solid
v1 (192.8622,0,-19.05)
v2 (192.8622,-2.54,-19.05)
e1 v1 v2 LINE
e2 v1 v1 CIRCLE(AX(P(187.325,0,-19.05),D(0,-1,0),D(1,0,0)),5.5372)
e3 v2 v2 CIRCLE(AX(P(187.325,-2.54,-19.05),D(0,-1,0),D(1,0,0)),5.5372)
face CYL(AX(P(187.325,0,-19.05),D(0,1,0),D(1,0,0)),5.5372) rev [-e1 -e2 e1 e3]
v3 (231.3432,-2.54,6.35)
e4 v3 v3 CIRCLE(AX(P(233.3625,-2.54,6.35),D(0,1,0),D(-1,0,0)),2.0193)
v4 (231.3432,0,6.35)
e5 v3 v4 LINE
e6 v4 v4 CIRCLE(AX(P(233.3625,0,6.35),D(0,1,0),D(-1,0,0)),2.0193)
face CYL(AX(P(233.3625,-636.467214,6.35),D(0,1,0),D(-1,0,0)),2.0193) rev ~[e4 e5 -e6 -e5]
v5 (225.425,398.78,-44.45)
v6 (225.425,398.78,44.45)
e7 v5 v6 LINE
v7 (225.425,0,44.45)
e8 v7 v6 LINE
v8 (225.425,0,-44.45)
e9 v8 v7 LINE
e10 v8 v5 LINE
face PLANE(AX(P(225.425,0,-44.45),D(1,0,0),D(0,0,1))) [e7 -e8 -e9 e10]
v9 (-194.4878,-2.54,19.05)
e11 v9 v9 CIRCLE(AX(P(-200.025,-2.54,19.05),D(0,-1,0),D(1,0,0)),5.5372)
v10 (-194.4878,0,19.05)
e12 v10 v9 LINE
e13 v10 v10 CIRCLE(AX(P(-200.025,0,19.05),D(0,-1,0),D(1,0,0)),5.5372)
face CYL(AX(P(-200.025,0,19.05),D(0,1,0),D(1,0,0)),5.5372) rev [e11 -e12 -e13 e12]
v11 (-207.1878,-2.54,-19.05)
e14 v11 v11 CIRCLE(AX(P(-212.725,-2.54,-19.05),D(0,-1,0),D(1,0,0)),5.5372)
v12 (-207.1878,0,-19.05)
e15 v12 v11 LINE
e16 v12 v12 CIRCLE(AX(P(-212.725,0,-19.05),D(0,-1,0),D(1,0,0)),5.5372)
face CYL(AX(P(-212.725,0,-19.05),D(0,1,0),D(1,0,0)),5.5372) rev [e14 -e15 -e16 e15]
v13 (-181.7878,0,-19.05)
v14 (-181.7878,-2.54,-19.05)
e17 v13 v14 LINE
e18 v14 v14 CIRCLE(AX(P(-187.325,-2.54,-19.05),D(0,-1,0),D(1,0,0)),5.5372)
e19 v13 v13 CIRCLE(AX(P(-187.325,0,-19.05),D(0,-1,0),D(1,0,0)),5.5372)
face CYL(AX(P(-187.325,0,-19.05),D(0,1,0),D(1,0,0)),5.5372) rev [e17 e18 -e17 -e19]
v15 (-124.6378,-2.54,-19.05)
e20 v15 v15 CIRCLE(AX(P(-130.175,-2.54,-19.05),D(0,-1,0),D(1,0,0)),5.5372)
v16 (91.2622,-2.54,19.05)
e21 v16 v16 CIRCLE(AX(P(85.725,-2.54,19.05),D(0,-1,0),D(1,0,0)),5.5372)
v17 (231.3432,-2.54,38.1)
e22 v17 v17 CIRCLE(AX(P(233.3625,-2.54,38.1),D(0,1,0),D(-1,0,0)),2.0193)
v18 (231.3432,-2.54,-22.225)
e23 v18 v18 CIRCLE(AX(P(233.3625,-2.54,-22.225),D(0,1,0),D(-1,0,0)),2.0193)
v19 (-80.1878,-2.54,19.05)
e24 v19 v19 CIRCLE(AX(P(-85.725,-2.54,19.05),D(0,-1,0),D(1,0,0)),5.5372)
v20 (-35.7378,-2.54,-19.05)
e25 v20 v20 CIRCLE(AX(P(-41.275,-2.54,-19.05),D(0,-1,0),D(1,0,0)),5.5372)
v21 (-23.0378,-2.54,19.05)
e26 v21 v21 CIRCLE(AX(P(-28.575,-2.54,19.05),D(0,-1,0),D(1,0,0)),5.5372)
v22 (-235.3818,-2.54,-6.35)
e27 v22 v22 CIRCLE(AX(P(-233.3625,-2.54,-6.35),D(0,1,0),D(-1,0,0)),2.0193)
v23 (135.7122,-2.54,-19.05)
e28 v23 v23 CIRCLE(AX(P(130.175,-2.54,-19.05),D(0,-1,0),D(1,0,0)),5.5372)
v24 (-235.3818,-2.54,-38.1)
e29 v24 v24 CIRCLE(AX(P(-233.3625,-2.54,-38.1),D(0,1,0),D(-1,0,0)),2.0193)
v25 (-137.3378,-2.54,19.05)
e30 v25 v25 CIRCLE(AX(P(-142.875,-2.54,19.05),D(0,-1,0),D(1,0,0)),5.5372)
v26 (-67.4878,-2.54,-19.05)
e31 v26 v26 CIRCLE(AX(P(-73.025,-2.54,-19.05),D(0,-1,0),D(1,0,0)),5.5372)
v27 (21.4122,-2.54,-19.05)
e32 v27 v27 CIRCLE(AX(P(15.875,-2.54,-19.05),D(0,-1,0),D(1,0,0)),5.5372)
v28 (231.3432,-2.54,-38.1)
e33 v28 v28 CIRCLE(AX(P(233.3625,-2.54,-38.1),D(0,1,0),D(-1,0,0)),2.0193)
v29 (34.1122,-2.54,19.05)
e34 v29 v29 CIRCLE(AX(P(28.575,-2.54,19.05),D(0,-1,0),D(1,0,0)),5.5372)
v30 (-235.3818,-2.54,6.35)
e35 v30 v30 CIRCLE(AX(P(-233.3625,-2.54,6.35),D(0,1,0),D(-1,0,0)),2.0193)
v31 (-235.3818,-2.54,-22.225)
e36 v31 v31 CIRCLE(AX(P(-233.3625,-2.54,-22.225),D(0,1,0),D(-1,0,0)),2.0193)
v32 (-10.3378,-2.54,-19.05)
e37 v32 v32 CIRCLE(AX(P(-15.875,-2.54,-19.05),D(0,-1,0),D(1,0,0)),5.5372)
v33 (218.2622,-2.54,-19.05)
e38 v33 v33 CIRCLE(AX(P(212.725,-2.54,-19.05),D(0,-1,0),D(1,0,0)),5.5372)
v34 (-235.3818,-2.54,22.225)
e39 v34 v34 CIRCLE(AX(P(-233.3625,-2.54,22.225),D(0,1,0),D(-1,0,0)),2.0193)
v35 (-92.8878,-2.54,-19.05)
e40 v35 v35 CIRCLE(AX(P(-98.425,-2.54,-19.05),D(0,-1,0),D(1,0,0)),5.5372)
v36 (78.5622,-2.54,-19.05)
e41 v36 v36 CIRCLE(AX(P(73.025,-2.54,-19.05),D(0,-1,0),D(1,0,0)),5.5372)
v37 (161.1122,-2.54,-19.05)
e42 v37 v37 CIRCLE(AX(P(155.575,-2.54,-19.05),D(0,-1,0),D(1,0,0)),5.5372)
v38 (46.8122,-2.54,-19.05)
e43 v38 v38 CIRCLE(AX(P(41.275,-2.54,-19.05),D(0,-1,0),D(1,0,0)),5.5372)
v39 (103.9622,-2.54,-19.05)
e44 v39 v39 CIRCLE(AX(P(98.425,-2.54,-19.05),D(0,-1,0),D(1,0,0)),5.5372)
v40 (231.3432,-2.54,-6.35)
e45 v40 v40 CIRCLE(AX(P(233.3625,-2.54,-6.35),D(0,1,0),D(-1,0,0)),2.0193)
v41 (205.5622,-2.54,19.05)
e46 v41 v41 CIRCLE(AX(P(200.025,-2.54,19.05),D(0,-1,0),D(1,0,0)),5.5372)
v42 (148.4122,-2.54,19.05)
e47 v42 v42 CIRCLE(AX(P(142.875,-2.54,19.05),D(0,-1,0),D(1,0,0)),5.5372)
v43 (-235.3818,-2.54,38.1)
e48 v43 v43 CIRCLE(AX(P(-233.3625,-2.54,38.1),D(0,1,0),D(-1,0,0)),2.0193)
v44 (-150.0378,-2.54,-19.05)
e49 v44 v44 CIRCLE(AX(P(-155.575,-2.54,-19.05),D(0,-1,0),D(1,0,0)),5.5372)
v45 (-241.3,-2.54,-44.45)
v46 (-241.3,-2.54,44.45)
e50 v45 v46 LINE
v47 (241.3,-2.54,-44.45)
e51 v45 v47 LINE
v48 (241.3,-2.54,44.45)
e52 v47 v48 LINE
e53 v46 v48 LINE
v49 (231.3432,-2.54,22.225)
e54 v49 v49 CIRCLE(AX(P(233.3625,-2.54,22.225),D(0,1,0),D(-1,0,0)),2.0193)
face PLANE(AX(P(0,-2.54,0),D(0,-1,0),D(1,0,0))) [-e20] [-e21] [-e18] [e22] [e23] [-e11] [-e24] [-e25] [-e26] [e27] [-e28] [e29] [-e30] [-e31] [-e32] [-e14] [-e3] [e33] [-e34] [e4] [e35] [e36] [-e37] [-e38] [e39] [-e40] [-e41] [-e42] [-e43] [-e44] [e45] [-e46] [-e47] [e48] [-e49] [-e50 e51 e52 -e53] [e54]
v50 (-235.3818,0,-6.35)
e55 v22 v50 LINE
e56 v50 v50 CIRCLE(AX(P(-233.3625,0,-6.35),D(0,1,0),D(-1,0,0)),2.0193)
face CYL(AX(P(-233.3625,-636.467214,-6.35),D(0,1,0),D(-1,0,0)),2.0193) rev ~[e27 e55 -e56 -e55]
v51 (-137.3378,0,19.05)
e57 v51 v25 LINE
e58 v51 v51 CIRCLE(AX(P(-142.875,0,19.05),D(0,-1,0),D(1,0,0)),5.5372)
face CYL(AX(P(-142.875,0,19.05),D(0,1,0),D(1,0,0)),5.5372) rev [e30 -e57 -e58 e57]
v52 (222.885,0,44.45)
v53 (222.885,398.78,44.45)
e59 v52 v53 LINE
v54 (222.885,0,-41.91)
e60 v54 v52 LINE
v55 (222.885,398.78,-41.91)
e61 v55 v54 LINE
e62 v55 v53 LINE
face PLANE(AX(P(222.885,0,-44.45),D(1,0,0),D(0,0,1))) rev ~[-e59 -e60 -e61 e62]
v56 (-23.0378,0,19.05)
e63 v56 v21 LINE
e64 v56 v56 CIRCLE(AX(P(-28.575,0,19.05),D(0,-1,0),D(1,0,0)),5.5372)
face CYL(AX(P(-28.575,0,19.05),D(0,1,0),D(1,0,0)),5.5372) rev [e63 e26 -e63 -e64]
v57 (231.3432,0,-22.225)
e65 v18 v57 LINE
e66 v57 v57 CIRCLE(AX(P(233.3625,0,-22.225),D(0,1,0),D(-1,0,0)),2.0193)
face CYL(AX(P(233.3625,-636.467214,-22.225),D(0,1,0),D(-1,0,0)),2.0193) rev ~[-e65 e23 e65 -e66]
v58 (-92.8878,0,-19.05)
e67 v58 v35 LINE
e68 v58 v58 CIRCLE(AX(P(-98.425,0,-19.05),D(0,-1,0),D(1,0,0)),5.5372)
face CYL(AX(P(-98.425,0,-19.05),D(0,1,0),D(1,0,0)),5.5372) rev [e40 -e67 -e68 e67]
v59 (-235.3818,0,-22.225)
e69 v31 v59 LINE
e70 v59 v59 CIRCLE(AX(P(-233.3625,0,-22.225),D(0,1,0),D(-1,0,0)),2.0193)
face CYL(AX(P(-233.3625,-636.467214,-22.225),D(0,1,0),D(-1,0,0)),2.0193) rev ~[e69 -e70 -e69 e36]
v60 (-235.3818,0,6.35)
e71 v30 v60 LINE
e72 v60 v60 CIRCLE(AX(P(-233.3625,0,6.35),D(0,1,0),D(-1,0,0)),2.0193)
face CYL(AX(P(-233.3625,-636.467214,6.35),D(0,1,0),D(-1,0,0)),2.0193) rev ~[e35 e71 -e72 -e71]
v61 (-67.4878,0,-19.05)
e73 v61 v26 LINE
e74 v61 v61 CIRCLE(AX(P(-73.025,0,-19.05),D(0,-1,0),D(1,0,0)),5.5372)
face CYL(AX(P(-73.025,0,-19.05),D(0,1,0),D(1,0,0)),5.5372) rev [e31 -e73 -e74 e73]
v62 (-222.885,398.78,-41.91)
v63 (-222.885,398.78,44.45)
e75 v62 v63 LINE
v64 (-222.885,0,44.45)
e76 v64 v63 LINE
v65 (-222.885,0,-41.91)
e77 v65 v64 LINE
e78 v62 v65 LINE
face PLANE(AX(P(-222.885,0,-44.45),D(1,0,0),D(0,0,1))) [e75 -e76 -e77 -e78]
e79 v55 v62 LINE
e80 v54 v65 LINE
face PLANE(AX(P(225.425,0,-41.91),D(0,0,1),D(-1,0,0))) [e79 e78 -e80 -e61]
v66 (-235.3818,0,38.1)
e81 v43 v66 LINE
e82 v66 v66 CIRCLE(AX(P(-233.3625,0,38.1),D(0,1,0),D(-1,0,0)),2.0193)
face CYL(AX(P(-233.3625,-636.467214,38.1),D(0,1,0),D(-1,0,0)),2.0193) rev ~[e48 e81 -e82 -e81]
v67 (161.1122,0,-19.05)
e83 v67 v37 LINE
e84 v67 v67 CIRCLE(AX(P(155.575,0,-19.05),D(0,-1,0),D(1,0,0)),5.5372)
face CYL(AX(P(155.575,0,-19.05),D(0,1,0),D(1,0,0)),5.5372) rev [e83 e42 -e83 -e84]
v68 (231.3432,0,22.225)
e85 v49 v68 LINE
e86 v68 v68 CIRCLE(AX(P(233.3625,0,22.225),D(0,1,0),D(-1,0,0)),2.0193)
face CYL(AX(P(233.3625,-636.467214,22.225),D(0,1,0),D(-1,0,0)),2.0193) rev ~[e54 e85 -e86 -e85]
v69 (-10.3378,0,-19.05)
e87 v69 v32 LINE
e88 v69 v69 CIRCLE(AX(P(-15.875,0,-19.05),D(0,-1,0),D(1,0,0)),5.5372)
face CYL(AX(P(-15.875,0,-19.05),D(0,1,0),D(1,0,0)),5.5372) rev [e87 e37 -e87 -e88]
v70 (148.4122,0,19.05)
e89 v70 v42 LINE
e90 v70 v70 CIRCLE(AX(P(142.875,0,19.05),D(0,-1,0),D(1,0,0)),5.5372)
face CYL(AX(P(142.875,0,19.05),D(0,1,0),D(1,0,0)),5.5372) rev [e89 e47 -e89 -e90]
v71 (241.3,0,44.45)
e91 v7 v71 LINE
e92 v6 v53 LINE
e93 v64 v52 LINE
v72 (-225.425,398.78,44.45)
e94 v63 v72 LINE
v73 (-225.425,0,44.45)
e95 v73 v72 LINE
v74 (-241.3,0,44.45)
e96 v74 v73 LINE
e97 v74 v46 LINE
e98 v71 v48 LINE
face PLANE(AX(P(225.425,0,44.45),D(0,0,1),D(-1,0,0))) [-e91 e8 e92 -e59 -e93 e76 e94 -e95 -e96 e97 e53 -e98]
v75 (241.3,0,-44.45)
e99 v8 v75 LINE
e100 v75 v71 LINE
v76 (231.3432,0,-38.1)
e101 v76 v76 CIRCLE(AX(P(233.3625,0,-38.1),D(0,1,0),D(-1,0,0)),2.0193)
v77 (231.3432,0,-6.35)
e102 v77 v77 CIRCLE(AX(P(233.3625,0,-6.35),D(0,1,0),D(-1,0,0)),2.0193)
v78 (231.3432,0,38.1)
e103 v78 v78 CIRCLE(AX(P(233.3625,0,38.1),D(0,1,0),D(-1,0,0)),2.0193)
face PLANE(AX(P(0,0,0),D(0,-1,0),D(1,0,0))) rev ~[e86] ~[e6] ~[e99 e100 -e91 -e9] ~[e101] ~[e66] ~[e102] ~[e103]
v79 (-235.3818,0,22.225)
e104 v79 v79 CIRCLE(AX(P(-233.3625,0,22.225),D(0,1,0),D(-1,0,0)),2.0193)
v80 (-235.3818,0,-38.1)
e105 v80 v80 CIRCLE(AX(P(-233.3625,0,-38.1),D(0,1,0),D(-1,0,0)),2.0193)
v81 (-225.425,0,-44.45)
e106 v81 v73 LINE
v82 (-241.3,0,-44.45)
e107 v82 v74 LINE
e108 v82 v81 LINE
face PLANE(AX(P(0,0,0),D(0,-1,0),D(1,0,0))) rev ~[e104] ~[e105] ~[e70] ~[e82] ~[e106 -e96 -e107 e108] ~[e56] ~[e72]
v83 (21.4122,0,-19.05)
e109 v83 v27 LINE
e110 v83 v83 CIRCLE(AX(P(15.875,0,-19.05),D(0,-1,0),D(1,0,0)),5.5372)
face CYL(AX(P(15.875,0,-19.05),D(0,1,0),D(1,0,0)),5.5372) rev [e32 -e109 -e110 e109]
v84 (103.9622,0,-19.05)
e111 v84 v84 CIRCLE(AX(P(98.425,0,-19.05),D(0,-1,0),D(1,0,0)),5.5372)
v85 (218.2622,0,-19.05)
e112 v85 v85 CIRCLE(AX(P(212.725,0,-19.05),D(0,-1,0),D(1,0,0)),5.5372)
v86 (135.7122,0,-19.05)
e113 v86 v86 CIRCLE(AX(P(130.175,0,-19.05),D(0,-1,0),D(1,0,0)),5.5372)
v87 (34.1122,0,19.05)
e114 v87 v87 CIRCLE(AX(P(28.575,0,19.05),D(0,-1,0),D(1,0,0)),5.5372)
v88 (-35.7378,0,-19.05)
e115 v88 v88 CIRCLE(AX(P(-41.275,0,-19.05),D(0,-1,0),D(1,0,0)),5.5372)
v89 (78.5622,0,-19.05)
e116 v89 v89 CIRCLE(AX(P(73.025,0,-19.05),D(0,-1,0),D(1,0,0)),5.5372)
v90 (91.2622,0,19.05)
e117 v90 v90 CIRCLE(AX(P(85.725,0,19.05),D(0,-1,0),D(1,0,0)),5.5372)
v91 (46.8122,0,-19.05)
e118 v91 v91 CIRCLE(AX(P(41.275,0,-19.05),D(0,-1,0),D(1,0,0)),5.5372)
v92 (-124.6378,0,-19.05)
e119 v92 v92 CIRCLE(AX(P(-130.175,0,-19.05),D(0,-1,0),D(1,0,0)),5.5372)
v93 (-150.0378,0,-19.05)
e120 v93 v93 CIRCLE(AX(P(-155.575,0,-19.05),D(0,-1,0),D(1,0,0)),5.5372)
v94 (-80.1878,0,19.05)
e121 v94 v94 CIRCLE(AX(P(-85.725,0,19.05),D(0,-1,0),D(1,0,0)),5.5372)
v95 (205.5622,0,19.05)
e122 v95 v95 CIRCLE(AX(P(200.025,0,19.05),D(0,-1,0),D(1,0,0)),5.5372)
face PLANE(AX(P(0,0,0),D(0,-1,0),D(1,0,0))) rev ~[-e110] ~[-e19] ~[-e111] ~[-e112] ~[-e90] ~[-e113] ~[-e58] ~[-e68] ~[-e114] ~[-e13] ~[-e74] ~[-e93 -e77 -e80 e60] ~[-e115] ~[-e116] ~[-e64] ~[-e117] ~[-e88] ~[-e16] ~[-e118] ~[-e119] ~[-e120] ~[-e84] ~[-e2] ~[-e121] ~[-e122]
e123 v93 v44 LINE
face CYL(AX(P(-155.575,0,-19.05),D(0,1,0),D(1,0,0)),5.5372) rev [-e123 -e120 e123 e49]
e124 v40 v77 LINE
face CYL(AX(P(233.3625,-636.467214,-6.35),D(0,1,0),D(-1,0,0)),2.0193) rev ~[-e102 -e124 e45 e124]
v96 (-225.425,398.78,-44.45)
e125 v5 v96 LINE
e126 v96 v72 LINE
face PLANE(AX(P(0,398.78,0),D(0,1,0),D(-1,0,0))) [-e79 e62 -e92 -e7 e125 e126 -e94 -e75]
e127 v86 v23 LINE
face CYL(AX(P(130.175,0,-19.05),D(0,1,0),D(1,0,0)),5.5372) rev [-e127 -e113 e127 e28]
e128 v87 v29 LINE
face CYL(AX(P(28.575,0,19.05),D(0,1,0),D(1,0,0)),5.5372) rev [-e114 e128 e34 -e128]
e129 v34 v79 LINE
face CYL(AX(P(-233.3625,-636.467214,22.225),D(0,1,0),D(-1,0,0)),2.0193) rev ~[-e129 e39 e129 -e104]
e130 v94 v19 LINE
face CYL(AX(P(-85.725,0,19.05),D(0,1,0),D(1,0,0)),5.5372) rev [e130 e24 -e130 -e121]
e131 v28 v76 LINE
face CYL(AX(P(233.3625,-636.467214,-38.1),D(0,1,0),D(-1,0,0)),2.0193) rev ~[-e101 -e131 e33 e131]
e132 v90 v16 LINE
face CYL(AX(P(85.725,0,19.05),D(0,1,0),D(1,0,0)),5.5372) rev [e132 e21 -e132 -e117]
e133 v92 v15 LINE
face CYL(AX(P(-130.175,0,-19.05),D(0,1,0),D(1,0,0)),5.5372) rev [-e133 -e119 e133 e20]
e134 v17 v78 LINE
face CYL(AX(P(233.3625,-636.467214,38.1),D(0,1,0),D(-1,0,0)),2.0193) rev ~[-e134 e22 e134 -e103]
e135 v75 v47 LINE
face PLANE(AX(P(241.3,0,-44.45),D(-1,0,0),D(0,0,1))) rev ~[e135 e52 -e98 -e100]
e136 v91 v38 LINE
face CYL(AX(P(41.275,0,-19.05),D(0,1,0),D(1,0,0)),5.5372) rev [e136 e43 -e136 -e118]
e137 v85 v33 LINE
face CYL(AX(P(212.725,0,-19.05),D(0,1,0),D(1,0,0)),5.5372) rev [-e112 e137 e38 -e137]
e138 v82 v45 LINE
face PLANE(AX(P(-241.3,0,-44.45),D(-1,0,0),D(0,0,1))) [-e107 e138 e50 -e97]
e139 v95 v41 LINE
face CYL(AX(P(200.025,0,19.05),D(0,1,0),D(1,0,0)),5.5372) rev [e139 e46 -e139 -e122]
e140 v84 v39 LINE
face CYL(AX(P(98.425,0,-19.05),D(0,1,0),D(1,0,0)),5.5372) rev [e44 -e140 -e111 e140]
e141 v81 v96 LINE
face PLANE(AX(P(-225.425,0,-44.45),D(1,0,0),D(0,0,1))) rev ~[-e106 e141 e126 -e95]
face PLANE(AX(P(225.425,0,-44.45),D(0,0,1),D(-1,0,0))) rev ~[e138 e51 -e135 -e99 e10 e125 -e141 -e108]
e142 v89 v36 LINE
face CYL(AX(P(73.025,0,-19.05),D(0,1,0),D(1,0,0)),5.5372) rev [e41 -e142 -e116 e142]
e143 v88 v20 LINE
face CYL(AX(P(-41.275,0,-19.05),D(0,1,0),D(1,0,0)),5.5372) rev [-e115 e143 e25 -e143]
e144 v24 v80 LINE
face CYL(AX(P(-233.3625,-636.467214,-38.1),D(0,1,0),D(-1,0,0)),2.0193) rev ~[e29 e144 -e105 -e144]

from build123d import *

# Parameters (mm, degrees)
F0_W        = 482.6
F0_H        = 88.9
F0_R        = 5.5372
F1_DEPTH    = 2.54
F2_W        = 450.85
F2_H        = 88.9
F3_DEPTH    = 398.78
F4_DEPTH    = 398.781
F6_D        = 4.0386
F7_T        = 2.54
F7_T3_DEPTH = 93.98


# Not quite as in the source:
# - a shell that OpenCascade refuses in one call is made with other operations: the cavity is built on its own and cut out


with BuildPart() as f1:
    # F0 (on Front) → F1 (new body)
    with BuildSketch(Plane.XZ):
        Rectangle(F0_W, F0_H)
        with Locations((-212.725, -19.05)):
            Circle(F0_R, mode=Mode.SUBTRACT)
        with Locations((-187.325, -19.05)):
            Circle(F0_R, mode=Mode.SUBTRACT)
        with Locations((-155.575, -19.05)):
            Circle(F0_R, mode=Mode.SUBTRACT)
        with Locations((-130.175, -19.05)):
            Circle(F0_R, mode=Mode.SUBTRACT)
        with Locations((-98.425, -19.05)):
            Circle(F0_R, mode=Mode.SUBTRACT)
        with Locations((-73.025, -19.05)):
            Circle(F0_R, mode=Mode.SUBTRACT)
        with Locations((-41.275, -19.05)):
            Circle(F0_R, mode=Mode.SUBTRACT)
        with Locations((-15.875, -19.05)):
            Circle(F0_R, mode=Mode.SUBTRACT)
        with Locations((15.875, -19.05)):
            Circle(F0_R, mode=Mode.SUBTRACT)
        with Locations((41.275, -19.05)):
            Circle(F0_R, mode=Mode.SUBTRACT)
        with Locations((73.025, -19.05)):
            Circle(F0_R, mode=Mode.SUBTRACT)
        with Locations((98.425, -19.05)):
            Circle(F0_R, mode=Mode.SUBTRACT)
        with Locations((130.175, -19.05)):
            Circle(F0_R, mode=Mode.SUBTRACT)
        with Locations((155.575, -19.05)):
            Circle(F0_R, mode=Mode.SUBTRACT)
        with Locations((187.325, -19.05)):
            Circle(F0_R, mode=Mode.SUBTRACT)
        with Locations((212.725, -19.05)):
            Circle(F0_R, mode=Mode.SUBTRACT)
        with Locations((-200.025, 19.05)):
            Circle(F0_R, mode=Mode.SUBTRACT)
        with Locations((-142.875, 19.05)):
            Circle(F0_R, mode=Mode.SUBTRACT)
        with Locations((-85.725, 19.05)):
            Circle(F0_R, mode=Mode.SUBTRACT)
        with Locations((-28.575, 19.05)):
            Circle(F0_R, mode=Mode.SUBTRACT)
        with Locations((28.575, 19.05)):
            Circle(F0_R, mode=Mode.SUBTRACT)
        with Locations((85.725, 19.05)):
            Circle(F0_R, mode=Mode.SUBTRACT)
        with Locations((142.875, 19.05)):
            Circle(F0_R, mode=Mode.SUBTRACT)
        with Locations((200.025, 19.05)):
            Circle(F0_R, mode=Mode.SUBTRACT)
    extrude(amount=F1_DEPTH)

    # F2 (on face) → F3 (join)
    with BuildSketch(Plane(origin=(0, 0, 0), x_dir=(-1, 0, 0), z_dir=(0, 1, 0))):
        Rectangle(F2_W, F2_H)
    extrude(amount=F3_DEPTH)

    # F4 (cut, through all): faces of the model
    f4_faces = [f1.faces().sort_by_distance(p)[0] for p in [
        (-200.025, 0, 19.05),
        (-212.725, 0, -19.05),
        (-187.325, 0, -19.05),
        (-142.875, 0, 19.05),
        (-155.575, 0, -19.05),
        (-130.175, 0, -19.05),
        (-85.725, 0, 19.05),
        (-98.425, 0, -19.05),
        (-73.025, 0, -19.05),
        (-41.275, 0, -19.05),
        (-28.575, 0, 19.05),
        (-15.875, 0, -19.05),
        (15.875, 0, -19.05),
        (28.575, 0, 19.05),
        (41.275, 0, -19.05),
        (73.025, 0, -19.05),
        (85.725, 0, 19.05),
        (98.425, 0, -19.05),
        (130.175, 0, -19.05),
        (142.875, 0, 19.05),
        (155.575, 0, -19.05),
        (187.325, 0, -19.05),
        (200.025, 0, 19.05),
        (212.725, 0, -19.05),
    ]]
    extrude(f4_faces, amount=-F4_DEPTH, mode=Mode.SUBTRACT)

    # F6 (through all)
    with Locations(Plane.XZ.offset(2.54)):
        with Locations((233.3625, -38.1), (233.3625, -6.35), (-233.3625, 22.225), (233.3625, -22.225), (-233.3625, 38.1), (-233.3625, 6.35), (-233.3625, -22.225), (-233.3625, -6.35), (-233.3625, -38.1), (233.3625, 38.1), (233.3625, 22.225), (233.3625, 6.35)):
            Hole(F6_D / 2)

    # F7: shell of thickness 2.54, made by hand


with BuildPart() as f7_core1:
    # F7_t2: copy of F1
    add(f1.part)

    # the walls: a layer under each face that stays
    f7_faces = [f7_core1.faces().sort_by_distance(p)[0] for p in [
        (241.3, -1.27, 0),
        (0, -2.54, 0),
        (-241.3, -1.27, 0),
        (-233.3625, 0, 0),
        (-225.425, 199.39, 0),
        (225.425, 199.39, 0),
        (233.3625, 0, 0),
        (0, 198.12, -44.45),
        (-235.3818, -1.27, -38.1),
        (-235.3818, -1.27, -22.225),
        (-235.3818, -1.27, -6.35),
        (231.3432, -1.27, -38.1),
        (231.3432, -1.27, -22.225),
        (231.3432, -1.27, -6.35),
        (-235.3818, -1.27, 6.35),
        (-235.3818, -1.27, 22.225),
        (-235.3818, -1.27, 38.1),
        (231.3432, -1.27, 6.35),
        (231.3432, -1.27, 22.225),
        (231.3432, -1.27, 38.1),
    ]]
    thicken(f7_faces, amount=-F7_T, mode=Mode.SUBTRACT)

    # F7_s4 → F7_t3 (cut)
    with BuildSketch(Plane.XY.offset(-46.99)):
        Polygon((-225.4504, 0.0254), (-225.425, -2.54), (-222.885, -2.54), (-222.885, 0), align=None)
        Polygon((225.4504, 0.0254), (222.885, 0), (222.885, -2.54), (225.425, -2.54), align=None)
    extrude(amount=F7_T3_DEPTH, mode=Mode.SUBTRACT)


with BuildPart() as f1_1:
    add(f1.part)

    # what is left inside the walls is the cavity
    f7_cavity = [f7_core1.part.solids().sort_by_distance(p)[0] for p in [
        (0, 132.926667, 44.4246),
    ]]
    add(f7_cavity, mode=Mode.SUBTRACT)


solid = f1_1.part
